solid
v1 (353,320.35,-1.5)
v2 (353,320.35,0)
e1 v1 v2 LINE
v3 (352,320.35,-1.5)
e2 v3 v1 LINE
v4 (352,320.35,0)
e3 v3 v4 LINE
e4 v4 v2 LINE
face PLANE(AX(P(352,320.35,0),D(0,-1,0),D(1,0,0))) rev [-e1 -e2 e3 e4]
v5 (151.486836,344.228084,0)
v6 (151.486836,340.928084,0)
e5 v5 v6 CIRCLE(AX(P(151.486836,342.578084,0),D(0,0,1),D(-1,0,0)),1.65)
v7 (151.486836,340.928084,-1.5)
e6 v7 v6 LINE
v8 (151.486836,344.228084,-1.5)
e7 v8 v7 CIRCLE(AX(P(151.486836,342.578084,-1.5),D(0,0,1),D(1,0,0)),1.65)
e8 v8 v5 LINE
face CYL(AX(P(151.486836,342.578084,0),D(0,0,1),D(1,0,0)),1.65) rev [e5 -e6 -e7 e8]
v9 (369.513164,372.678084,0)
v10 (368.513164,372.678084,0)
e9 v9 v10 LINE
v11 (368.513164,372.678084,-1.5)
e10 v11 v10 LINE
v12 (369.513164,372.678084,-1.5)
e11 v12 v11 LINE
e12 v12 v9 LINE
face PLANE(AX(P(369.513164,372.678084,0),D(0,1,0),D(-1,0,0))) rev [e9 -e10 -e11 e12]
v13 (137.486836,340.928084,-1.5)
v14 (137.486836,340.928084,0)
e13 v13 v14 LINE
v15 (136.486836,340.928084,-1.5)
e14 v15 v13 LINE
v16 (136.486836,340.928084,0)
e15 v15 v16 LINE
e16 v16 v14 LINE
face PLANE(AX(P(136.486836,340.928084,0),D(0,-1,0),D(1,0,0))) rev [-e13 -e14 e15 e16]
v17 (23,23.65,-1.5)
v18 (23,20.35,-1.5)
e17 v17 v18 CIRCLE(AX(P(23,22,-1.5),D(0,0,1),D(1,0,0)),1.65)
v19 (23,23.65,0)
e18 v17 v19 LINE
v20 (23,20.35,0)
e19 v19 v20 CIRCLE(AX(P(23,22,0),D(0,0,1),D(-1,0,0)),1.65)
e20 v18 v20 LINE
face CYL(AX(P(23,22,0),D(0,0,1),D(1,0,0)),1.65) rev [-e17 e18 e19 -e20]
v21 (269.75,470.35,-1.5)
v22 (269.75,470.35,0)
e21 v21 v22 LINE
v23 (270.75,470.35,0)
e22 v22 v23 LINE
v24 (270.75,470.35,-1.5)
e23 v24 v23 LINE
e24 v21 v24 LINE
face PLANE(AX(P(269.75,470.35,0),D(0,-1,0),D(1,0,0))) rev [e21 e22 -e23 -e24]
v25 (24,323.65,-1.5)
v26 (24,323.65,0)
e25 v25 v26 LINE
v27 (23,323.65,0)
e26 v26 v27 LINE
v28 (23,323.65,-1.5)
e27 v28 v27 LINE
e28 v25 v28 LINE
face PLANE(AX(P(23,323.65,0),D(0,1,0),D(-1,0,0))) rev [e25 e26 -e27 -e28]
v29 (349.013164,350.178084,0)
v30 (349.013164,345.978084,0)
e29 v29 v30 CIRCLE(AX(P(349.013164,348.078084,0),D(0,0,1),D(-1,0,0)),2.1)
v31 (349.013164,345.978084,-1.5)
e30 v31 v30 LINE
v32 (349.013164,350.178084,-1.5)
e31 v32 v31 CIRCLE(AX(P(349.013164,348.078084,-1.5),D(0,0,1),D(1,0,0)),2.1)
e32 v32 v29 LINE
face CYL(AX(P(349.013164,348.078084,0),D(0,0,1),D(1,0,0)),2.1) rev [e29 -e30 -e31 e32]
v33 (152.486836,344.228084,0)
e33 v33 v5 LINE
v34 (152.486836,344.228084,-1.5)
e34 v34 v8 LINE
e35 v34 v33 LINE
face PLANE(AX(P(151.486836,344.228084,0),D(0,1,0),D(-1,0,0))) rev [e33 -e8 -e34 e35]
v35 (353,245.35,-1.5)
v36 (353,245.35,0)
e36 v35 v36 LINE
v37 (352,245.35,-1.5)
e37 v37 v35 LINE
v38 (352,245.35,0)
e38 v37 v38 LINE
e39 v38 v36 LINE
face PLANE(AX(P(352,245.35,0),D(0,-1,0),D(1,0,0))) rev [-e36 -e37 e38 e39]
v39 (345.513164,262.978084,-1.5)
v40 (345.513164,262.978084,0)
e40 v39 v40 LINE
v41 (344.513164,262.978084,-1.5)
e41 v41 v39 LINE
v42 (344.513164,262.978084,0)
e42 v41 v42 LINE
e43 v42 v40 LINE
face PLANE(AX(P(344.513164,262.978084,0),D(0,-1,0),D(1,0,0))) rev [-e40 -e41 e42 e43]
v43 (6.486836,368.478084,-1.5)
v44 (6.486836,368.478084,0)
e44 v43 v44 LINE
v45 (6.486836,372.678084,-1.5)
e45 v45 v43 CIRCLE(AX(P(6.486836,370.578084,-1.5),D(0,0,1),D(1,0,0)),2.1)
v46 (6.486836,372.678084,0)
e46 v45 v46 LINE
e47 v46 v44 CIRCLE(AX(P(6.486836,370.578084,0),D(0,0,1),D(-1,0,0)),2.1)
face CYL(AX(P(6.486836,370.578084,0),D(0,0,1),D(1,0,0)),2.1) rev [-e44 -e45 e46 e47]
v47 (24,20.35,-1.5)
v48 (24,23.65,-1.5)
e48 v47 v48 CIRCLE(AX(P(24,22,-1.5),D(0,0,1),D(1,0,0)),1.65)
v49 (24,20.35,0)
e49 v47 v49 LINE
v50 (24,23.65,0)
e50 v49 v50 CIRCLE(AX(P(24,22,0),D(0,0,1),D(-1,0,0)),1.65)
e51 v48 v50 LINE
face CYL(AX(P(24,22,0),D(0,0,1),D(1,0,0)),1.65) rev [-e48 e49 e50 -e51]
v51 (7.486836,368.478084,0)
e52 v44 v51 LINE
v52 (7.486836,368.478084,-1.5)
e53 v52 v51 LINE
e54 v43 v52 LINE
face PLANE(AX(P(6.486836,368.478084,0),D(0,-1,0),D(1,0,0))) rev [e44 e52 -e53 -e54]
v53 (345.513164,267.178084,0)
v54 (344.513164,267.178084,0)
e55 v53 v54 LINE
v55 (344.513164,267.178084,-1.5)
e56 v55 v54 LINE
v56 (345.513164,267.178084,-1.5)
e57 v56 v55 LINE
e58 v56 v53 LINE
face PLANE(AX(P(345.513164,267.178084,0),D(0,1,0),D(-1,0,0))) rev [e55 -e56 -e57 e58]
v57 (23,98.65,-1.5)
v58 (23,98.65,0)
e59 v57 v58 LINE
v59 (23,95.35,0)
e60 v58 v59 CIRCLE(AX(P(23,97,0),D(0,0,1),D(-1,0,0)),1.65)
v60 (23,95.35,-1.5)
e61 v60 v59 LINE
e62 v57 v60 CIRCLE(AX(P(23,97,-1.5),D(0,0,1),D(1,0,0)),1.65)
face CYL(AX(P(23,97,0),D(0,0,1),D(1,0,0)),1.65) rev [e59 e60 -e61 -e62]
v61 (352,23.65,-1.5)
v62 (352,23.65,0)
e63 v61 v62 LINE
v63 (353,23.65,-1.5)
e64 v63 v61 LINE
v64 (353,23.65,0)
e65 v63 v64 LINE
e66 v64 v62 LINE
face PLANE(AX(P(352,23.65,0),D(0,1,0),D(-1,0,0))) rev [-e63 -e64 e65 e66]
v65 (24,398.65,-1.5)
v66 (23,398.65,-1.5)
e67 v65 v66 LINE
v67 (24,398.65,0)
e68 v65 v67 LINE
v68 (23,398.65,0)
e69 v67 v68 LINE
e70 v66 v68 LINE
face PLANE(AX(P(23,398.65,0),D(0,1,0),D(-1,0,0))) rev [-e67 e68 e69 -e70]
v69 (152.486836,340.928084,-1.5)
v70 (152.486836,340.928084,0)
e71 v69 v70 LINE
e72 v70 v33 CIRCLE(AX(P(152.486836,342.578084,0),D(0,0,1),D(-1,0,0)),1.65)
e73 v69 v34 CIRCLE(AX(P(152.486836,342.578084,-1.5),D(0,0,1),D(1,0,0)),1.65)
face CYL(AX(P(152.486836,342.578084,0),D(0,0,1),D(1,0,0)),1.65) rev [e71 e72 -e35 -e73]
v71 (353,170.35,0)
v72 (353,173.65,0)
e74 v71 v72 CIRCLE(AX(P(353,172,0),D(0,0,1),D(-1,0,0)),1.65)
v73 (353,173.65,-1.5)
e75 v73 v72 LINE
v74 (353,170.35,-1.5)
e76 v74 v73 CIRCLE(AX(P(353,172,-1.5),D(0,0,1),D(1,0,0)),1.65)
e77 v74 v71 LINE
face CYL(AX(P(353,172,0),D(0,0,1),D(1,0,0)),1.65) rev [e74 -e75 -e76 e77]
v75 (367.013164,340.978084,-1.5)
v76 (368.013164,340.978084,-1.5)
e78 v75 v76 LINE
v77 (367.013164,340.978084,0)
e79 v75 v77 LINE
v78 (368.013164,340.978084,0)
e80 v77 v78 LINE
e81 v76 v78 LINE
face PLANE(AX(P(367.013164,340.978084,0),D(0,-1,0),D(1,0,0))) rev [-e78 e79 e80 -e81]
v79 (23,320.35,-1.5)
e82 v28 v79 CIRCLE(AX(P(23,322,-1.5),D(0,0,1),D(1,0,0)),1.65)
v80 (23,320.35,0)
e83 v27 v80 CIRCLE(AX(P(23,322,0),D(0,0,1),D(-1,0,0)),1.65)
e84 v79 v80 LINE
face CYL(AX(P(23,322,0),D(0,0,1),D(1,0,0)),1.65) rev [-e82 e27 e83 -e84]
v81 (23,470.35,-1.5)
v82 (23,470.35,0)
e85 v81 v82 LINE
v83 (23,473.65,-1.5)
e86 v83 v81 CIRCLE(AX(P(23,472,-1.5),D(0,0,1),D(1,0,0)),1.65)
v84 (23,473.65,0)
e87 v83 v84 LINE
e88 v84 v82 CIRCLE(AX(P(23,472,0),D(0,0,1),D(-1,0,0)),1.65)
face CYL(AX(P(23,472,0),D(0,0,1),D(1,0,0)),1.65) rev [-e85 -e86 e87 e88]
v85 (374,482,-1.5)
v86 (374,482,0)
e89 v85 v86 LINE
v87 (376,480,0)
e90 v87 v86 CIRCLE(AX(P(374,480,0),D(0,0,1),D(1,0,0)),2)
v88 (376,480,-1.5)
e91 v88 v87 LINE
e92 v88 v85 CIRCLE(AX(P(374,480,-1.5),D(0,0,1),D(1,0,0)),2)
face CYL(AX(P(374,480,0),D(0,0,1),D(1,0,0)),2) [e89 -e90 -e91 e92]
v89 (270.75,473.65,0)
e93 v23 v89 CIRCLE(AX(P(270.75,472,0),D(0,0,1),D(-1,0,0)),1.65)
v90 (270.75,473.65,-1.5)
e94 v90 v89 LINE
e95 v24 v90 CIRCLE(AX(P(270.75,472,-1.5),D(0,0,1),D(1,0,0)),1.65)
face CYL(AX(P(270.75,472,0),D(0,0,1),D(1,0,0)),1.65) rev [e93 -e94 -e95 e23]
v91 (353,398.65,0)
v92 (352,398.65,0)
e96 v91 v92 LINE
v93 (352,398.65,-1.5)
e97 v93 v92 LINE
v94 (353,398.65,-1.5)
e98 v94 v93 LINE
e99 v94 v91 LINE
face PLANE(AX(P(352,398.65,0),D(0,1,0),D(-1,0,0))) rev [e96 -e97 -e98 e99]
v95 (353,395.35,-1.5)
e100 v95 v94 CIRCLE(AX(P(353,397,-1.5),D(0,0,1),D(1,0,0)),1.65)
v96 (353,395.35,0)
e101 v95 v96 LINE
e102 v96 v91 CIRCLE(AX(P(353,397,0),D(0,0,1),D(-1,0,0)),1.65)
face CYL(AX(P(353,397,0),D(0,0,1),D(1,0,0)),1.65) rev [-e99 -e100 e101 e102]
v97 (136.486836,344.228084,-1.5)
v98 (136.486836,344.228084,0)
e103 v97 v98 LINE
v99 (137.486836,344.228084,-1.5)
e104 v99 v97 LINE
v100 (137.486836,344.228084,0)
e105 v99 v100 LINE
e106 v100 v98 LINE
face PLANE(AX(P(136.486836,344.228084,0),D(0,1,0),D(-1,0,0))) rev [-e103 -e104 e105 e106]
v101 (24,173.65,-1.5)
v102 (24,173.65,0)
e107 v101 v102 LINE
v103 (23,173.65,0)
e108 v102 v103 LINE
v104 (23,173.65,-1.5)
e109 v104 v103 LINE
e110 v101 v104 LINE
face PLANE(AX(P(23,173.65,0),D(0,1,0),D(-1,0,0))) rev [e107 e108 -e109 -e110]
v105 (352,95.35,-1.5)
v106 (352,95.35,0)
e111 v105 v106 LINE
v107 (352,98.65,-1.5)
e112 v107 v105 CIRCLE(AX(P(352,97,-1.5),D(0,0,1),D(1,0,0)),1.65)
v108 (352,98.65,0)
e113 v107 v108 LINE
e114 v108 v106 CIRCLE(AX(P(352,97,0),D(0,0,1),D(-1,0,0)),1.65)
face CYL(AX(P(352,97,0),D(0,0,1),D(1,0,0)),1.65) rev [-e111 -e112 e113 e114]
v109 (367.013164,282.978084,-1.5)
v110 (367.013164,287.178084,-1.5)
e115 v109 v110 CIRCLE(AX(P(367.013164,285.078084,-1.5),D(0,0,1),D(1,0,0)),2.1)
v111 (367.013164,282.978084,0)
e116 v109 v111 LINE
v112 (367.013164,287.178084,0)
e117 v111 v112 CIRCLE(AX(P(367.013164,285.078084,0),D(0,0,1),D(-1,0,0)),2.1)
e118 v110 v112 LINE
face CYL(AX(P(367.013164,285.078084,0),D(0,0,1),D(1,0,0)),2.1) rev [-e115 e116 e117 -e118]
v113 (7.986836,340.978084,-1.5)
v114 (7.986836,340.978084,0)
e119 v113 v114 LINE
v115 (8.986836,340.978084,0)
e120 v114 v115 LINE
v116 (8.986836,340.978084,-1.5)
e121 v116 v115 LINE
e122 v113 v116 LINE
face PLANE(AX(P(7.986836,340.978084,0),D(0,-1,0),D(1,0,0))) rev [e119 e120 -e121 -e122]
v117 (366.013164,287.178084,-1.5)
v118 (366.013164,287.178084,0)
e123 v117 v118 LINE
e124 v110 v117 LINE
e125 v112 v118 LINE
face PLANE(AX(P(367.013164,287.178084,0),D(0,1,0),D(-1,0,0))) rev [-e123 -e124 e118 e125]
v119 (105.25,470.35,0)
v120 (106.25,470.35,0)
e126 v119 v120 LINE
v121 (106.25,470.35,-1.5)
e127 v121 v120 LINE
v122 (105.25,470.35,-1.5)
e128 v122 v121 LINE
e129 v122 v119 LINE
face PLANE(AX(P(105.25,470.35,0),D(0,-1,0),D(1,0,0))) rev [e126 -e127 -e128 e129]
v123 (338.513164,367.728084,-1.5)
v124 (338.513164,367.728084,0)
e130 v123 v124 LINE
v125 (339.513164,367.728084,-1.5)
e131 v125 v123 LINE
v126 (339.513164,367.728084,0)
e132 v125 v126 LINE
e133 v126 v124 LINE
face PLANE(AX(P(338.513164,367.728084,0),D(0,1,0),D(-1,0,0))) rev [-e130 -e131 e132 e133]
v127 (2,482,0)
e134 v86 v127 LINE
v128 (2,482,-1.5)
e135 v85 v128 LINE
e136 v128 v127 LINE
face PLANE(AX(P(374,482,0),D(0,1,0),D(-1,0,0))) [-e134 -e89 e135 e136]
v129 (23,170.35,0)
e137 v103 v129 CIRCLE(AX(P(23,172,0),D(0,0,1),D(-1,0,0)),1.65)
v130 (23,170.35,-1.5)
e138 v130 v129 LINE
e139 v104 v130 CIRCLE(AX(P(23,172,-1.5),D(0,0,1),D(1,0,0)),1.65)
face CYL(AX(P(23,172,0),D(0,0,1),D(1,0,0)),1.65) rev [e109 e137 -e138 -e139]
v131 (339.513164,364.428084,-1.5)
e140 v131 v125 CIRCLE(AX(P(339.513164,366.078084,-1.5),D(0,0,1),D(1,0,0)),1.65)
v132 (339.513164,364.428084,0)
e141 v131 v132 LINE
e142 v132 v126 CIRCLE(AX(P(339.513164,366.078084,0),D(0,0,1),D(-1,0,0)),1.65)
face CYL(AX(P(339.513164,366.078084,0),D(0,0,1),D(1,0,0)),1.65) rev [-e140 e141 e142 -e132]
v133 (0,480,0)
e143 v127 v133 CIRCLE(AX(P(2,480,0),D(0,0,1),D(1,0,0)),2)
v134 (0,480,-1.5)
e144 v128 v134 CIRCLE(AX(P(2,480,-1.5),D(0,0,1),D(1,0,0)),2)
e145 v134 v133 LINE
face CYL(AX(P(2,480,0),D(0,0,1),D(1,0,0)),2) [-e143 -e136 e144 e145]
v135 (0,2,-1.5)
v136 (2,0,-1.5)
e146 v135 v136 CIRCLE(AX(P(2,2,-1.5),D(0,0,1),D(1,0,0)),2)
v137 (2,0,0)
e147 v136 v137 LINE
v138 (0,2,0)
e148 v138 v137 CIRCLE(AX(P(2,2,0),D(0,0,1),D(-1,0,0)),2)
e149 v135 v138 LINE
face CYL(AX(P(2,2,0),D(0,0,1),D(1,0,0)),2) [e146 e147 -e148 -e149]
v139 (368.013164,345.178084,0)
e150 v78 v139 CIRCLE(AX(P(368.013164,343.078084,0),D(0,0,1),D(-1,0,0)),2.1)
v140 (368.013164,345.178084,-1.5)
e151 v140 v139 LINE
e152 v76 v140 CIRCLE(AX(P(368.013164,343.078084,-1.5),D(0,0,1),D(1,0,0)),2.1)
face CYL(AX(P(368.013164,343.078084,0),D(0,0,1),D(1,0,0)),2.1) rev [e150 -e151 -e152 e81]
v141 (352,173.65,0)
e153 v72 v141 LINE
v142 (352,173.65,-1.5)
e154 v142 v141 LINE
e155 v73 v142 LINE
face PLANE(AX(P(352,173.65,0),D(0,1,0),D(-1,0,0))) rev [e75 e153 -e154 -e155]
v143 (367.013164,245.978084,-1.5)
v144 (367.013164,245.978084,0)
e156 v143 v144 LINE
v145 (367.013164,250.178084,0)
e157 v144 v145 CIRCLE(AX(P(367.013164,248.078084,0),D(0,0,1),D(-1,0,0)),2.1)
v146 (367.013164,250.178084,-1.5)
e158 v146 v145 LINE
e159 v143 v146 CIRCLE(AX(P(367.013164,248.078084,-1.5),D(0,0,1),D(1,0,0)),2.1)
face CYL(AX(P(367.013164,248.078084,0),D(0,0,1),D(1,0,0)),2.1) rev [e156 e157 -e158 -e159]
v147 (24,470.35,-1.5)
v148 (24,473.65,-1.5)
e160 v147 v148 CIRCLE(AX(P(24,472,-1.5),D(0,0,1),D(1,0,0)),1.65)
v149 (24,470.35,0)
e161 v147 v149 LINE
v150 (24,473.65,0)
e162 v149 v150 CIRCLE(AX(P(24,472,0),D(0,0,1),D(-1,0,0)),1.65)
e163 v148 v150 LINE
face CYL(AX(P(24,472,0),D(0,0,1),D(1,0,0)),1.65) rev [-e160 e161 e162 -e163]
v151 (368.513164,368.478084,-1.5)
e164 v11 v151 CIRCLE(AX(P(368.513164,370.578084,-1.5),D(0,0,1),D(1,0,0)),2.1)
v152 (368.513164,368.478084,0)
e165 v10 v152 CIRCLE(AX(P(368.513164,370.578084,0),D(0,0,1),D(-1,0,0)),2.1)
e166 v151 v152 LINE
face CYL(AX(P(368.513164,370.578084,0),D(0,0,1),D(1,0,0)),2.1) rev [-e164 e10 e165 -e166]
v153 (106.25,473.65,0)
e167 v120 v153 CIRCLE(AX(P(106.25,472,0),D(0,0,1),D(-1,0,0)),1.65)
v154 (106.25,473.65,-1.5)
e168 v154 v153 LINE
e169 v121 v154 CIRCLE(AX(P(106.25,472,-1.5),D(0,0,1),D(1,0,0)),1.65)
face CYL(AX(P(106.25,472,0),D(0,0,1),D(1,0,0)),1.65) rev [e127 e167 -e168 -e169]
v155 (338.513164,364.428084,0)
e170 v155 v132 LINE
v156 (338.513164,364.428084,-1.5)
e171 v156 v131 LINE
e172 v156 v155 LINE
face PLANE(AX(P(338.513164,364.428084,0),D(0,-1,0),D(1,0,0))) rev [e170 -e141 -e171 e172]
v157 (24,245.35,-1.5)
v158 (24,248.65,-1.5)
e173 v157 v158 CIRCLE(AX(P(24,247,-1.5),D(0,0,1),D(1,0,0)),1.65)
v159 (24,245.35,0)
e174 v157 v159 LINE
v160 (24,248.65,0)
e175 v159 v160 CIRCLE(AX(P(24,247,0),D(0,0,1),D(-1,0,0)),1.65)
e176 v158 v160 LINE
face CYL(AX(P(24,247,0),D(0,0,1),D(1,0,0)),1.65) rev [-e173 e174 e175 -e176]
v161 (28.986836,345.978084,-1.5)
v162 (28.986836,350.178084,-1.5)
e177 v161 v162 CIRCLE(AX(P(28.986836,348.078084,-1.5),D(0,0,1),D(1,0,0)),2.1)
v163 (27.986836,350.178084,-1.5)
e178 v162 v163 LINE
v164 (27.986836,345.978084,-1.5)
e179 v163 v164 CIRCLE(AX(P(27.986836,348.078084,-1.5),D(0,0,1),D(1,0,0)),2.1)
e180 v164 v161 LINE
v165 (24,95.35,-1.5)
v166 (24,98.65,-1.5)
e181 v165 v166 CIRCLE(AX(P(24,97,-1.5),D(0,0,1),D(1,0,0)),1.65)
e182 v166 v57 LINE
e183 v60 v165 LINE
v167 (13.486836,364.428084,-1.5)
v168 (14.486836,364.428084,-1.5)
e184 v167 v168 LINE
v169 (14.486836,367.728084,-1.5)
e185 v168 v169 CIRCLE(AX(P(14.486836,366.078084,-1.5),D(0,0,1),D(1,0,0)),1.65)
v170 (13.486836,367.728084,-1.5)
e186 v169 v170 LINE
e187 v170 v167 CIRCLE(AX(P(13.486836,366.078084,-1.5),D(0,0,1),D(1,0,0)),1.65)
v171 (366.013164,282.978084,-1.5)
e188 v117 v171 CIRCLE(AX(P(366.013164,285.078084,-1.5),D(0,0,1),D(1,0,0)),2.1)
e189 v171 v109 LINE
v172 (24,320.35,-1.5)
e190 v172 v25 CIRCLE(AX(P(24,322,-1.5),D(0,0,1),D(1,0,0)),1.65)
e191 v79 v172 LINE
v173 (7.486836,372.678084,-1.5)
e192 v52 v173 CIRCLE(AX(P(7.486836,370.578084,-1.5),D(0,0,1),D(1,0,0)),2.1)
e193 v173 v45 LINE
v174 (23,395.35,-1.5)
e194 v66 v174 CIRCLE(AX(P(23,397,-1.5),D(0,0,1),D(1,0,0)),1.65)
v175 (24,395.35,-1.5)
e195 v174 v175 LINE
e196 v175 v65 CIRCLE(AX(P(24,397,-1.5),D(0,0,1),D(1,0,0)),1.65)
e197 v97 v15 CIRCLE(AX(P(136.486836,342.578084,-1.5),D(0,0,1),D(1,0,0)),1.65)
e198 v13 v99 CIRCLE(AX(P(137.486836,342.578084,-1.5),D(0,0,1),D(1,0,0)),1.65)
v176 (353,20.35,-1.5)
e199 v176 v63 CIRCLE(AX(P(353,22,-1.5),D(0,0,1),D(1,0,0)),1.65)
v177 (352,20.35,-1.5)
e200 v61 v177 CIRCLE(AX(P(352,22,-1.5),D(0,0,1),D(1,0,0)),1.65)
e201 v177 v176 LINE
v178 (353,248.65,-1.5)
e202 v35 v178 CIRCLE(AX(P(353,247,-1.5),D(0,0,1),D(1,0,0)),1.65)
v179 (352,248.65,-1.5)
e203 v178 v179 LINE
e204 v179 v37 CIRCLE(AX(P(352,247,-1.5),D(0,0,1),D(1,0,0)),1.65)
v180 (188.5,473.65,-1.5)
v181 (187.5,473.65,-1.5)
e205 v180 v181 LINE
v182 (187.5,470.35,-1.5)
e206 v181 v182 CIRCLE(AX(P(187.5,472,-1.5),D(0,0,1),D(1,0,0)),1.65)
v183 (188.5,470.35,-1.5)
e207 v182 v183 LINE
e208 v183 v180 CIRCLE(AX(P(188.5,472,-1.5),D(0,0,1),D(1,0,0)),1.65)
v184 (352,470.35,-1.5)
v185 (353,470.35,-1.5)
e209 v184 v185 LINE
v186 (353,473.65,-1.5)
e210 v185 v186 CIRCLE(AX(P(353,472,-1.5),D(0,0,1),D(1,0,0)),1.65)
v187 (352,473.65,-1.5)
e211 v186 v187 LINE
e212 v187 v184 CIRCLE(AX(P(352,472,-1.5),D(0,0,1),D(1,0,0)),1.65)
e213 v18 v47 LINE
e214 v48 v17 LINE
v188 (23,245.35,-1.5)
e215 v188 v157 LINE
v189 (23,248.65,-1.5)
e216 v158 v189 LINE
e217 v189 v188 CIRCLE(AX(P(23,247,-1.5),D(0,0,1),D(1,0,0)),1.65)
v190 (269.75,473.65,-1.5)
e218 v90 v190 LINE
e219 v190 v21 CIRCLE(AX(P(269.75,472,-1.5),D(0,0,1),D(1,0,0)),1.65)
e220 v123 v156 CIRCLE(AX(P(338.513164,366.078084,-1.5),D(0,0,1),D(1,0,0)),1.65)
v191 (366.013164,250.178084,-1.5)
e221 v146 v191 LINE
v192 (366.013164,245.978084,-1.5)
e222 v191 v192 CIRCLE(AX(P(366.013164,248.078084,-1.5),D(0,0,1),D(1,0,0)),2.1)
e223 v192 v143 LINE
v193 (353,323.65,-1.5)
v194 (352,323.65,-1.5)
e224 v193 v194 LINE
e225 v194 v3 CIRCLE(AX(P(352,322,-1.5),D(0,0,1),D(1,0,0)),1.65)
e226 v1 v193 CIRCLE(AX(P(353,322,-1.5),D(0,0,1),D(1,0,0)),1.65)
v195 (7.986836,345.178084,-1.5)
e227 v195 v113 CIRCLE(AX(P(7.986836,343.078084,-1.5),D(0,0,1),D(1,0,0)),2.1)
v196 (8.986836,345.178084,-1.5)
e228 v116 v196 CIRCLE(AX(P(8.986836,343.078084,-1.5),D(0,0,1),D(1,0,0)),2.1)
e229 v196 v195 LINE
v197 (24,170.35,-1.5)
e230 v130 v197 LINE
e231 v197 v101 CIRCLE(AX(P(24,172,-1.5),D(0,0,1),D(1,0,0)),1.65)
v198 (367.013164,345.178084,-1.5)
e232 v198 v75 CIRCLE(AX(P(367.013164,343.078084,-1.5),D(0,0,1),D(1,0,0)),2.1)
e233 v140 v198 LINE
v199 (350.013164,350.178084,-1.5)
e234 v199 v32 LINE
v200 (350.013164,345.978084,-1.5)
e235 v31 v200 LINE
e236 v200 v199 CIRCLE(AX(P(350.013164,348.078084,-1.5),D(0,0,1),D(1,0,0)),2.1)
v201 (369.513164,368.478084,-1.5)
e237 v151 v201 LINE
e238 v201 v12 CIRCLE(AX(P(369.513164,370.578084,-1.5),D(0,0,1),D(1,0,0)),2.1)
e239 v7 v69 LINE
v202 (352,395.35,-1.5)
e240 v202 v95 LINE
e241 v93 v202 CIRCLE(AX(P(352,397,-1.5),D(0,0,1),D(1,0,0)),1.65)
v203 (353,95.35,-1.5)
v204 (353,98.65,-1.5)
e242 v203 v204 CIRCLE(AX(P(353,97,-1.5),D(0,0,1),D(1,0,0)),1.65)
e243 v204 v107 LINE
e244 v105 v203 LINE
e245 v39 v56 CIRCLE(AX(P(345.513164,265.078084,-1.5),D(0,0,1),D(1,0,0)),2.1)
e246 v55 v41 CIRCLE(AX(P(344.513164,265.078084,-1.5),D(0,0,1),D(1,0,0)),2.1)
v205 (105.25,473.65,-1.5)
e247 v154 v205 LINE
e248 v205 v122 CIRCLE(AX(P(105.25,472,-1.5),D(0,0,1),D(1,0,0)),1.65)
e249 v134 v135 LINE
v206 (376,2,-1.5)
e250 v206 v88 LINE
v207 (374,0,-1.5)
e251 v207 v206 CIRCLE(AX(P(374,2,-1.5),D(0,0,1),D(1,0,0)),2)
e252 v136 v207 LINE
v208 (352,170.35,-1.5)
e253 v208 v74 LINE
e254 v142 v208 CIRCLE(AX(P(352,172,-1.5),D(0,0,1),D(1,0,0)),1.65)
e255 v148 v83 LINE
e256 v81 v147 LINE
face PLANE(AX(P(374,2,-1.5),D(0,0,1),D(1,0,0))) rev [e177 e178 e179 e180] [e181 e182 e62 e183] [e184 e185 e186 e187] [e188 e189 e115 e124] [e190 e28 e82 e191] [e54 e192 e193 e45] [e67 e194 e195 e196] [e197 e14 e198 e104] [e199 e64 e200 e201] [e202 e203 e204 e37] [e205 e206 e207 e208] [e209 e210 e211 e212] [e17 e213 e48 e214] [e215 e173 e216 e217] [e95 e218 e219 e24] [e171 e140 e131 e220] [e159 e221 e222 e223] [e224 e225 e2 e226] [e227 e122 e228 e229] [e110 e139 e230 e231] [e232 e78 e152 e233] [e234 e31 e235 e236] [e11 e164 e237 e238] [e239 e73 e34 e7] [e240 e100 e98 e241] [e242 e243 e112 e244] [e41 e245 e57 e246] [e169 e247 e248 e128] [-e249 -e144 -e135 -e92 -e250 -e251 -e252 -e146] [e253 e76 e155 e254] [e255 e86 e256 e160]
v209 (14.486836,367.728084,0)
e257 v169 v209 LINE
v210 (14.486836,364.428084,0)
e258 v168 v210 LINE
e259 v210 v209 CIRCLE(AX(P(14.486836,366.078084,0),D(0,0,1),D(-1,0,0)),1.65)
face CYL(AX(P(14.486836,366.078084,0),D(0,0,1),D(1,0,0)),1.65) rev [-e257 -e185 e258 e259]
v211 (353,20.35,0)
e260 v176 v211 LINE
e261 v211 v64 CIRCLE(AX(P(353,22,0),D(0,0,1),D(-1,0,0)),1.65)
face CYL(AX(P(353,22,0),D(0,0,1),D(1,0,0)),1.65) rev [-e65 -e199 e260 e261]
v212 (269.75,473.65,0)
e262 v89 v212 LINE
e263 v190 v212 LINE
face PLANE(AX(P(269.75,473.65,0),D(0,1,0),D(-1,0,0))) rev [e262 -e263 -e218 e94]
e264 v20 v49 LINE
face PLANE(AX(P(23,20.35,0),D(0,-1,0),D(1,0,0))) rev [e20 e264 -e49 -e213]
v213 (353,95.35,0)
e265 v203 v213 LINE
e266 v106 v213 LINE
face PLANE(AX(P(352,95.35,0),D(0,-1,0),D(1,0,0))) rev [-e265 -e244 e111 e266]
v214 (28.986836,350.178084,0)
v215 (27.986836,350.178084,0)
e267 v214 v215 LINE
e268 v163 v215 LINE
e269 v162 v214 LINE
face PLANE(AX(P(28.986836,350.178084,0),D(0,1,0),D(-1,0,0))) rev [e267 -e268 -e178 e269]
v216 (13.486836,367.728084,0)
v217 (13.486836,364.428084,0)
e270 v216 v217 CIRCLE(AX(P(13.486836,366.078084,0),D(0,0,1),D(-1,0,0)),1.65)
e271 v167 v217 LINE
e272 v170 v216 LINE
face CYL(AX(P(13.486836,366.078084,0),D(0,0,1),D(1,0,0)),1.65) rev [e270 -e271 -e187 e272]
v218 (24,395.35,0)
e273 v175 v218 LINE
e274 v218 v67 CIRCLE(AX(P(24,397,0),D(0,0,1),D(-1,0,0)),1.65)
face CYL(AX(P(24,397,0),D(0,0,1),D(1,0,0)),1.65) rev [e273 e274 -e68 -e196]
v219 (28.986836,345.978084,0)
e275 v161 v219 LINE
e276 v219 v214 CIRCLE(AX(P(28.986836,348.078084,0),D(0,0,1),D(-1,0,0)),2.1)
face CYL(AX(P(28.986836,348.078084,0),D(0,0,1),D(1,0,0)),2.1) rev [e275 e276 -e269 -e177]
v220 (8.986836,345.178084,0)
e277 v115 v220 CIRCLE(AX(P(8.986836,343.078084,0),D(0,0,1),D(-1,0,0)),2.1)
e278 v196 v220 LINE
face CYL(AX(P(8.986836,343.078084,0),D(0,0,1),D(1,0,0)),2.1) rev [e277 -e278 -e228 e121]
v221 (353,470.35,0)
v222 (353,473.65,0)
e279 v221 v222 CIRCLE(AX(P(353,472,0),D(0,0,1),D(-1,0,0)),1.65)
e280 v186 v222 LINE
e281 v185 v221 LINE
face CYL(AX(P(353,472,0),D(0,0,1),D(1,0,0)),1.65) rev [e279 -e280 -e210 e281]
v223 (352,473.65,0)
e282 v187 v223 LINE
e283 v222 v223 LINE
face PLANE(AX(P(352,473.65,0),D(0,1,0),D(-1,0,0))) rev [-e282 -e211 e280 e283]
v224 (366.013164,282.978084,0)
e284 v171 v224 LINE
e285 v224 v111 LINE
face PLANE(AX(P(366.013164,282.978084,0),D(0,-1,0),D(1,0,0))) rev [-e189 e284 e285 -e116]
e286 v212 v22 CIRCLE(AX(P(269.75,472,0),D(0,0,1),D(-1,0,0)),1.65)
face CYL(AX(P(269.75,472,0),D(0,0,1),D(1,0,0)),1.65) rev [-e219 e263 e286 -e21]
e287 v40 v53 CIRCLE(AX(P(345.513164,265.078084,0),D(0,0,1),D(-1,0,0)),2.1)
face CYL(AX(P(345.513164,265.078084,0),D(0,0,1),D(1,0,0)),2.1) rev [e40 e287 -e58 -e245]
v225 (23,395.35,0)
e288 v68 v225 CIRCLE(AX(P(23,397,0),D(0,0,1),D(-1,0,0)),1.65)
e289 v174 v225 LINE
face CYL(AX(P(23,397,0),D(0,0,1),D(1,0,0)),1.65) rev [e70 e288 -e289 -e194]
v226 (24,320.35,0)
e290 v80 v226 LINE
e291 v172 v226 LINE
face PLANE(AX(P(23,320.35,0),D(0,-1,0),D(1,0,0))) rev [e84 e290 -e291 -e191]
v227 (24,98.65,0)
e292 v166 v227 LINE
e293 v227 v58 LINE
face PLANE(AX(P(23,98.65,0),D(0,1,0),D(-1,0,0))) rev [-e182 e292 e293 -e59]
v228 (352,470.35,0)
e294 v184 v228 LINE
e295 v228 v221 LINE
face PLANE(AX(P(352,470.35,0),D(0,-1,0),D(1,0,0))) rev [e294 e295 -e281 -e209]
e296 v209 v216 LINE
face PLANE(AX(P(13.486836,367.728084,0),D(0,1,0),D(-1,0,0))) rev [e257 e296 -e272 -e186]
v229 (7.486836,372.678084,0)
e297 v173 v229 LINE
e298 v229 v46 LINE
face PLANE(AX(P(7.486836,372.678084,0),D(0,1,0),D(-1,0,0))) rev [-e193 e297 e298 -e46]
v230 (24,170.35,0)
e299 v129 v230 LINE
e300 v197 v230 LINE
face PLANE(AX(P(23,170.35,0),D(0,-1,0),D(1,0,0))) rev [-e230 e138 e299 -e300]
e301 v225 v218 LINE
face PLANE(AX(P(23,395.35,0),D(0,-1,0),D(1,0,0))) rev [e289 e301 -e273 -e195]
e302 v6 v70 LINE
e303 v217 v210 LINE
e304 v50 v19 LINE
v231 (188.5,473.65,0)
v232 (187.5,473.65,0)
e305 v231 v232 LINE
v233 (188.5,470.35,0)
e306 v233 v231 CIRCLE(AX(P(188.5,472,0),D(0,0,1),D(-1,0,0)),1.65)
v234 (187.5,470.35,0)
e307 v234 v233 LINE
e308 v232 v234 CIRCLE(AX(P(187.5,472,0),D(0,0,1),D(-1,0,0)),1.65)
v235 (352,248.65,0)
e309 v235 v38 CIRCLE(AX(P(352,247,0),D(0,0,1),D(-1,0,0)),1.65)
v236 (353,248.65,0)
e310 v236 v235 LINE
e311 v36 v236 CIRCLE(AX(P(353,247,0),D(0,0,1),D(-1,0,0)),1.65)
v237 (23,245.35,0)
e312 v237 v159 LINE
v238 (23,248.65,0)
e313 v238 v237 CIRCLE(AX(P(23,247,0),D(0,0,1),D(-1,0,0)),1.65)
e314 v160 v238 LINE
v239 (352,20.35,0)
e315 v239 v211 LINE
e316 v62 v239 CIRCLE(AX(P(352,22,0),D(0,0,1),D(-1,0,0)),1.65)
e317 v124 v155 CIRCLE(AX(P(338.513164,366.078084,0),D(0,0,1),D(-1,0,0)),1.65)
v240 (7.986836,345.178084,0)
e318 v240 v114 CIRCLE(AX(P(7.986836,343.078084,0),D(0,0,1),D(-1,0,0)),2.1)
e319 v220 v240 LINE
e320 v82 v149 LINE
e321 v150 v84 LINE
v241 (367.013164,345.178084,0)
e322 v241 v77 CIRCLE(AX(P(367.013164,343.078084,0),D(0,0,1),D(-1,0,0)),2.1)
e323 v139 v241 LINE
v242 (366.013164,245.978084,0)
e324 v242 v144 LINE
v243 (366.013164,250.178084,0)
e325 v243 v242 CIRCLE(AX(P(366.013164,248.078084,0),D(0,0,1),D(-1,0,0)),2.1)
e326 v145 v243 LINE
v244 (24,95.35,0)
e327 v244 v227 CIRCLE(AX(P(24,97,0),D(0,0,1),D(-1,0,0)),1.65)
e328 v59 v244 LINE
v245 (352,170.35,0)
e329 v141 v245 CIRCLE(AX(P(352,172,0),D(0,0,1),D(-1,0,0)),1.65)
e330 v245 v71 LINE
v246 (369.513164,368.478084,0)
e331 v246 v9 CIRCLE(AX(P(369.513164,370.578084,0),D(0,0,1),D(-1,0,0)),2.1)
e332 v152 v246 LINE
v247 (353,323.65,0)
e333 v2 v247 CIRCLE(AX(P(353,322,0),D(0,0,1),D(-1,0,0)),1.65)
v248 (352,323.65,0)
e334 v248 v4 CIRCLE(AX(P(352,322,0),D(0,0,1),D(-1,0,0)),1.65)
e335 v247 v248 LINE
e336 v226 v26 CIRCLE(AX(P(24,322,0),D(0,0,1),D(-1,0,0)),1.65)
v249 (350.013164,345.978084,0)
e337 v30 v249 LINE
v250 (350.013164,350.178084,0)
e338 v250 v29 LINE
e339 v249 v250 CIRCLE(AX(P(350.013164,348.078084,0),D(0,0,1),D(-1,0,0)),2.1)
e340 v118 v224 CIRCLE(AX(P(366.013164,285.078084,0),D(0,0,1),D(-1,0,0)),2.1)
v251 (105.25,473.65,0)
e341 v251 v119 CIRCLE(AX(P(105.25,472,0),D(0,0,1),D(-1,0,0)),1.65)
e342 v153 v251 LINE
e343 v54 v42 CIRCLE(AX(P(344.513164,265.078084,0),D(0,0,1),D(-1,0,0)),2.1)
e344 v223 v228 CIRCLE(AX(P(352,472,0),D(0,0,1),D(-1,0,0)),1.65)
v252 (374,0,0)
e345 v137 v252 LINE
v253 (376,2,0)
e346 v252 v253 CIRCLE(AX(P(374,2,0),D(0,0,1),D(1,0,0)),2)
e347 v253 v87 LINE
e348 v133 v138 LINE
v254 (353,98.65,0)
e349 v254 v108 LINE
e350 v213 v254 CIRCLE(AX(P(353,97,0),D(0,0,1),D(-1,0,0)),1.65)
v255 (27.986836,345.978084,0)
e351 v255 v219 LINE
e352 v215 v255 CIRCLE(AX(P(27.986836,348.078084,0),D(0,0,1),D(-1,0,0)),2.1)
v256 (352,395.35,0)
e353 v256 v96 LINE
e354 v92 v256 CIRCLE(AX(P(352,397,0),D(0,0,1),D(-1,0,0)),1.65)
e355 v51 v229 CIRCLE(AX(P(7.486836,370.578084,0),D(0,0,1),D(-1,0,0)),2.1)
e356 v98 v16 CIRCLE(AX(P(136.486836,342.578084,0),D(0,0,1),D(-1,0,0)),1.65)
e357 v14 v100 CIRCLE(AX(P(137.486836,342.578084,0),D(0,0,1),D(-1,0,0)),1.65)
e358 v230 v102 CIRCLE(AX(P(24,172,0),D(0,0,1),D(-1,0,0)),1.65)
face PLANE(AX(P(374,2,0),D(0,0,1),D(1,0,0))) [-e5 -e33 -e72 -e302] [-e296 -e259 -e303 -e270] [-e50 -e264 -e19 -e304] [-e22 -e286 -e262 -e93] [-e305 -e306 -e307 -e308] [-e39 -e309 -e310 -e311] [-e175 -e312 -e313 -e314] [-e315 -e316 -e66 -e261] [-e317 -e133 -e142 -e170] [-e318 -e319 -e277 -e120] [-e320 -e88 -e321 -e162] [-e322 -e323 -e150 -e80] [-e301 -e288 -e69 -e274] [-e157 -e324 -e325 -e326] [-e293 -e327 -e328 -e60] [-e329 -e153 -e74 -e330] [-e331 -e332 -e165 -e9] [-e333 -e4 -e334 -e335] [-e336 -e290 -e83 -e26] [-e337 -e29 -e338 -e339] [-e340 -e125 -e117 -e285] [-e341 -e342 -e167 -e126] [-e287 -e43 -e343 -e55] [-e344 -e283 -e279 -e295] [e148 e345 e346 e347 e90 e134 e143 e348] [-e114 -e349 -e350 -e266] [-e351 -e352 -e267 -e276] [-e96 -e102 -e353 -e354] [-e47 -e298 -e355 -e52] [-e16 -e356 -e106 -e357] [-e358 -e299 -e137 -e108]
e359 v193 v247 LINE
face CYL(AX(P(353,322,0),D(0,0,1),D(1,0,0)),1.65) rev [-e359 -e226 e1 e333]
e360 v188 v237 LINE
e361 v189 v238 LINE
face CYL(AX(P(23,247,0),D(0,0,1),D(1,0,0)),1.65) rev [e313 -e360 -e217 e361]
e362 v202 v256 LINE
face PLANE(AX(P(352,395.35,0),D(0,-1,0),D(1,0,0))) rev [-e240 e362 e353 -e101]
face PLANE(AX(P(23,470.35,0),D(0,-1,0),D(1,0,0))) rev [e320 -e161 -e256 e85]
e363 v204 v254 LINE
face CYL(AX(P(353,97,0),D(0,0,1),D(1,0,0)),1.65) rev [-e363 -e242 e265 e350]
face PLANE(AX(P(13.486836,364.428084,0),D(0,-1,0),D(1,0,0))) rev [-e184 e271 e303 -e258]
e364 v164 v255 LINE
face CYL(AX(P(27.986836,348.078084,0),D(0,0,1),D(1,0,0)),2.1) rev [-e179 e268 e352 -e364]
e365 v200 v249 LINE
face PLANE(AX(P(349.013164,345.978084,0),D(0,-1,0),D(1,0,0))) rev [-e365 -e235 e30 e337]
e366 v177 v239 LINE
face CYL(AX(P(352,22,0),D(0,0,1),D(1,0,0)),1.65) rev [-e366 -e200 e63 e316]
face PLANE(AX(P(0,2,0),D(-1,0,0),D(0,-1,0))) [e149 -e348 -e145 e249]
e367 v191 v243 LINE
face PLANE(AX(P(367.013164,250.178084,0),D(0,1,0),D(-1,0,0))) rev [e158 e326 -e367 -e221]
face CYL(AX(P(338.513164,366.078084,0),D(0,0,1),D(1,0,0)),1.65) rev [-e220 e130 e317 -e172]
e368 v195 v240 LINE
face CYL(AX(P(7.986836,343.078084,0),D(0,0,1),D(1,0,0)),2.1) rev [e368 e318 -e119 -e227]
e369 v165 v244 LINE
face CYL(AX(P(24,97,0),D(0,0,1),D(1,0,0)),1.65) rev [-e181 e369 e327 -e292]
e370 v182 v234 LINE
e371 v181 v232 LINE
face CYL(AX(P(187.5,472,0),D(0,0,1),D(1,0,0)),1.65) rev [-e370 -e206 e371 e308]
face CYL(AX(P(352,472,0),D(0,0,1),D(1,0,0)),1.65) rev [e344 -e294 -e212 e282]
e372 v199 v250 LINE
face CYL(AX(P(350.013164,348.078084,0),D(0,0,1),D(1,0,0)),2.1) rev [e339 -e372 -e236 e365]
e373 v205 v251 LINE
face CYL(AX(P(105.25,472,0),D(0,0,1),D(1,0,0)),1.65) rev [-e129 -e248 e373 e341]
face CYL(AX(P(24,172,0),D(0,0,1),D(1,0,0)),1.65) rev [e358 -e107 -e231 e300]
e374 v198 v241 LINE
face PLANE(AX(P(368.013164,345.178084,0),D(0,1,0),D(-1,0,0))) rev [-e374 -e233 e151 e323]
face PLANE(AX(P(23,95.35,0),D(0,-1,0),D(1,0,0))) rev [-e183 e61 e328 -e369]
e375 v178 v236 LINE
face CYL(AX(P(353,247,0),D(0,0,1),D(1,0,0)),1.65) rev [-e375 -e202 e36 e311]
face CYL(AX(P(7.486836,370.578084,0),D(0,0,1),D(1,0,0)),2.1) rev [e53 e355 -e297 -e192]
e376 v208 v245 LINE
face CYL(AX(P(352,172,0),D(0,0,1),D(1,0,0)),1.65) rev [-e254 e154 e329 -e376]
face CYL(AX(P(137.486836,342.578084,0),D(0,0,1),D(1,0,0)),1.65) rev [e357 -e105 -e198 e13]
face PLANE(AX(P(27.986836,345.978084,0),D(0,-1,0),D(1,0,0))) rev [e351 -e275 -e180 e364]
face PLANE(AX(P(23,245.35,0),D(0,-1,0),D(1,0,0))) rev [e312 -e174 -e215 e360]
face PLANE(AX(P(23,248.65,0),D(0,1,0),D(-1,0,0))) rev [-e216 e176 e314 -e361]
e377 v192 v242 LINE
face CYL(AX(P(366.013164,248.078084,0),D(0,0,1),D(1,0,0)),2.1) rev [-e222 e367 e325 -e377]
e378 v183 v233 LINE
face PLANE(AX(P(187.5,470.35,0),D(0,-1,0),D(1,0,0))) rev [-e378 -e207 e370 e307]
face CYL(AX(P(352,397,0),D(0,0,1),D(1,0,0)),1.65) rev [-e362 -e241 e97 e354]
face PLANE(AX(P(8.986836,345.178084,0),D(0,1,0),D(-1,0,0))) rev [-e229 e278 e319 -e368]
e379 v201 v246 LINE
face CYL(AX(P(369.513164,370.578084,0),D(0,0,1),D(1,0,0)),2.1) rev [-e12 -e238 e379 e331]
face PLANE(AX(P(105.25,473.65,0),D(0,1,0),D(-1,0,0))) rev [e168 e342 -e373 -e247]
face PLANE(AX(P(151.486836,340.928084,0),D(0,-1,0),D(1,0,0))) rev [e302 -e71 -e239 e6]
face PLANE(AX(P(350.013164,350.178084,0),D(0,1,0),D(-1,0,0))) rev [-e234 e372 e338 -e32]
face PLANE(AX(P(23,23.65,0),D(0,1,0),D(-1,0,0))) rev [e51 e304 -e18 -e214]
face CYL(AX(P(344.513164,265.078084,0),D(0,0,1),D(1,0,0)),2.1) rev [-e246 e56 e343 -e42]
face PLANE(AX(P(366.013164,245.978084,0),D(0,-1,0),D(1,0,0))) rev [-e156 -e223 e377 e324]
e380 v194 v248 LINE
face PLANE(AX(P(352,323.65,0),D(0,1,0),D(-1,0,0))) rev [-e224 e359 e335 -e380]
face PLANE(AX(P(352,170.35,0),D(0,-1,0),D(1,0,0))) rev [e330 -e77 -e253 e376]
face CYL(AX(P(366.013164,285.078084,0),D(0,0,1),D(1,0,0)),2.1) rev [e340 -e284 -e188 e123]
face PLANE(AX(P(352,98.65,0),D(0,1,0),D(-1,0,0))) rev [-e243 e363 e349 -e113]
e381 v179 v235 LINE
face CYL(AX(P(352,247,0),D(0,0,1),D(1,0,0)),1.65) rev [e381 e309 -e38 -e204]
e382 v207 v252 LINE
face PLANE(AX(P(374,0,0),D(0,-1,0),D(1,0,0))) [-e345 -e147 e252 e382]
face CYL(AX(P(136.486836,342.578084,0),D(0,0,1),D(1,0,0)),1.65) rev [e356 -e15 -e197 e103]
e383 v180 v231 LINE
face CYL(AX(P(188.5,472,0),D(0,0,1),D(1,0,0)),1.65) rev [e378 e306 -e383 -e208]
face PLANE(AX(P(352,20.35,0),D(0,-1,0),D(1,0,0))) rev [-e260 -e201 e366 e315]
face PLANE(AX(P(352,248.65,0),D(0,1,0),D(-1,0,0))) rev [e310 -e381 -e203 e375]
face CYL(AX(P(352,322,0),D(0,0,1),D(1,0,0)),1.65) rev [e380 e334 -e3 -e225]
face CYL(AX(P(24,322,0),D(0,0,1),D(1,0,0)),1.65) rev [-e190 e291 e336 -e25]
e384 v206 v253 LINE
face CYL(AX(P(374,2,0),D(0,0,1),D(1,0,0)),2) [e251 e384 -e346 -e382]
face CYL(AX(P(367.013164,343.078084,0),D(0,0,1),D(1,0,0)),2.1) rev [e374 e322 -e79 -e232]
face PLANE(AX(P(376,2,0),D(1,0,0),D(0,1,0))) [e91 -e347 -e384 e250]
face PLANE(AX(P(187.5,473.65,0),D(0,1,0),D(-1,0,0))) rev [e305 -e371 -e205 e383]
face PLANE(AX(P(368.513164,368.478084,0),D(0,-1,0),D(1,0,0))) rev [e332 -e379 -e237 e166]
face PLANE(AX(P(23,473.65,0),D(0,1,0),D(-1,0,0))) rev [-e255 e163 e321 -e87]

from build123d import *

# Parameters (mm, degrees)
CONVERT_SOLID1_START = -1.5
CONVERT_SOLID1_DEPTH = 1.5


# Read off the part's stored shape, not the designer's step: Convert-Solid1
with BuildPart() as part:
    # Convert-Solid1 outline → Convert-Solid1 (new body)
    with BuildSketch(Plane.XY.offset(CONVERT_SOLID1_START)):
        with BuildLine():
            Line((376, 2), (376, 480))
            ThreePointArc((376, 480), (375.414213562, 481.414213562), (374, 482))
            Line((374, 482), (2, 482))
            ThreePointArc((2, 482), (0.585786438, 481.414213562), (0, 480))
            Line((0, 480), (0, 2))
            ThreePointArc((0, 2), (0.585786438, 0.585786438), (2, 0))
            Line((2, 0), (374, 0))
            ThreePointArc((374, 0), (375.414213562, 0.585786438), (376, 2))
        make_face()
        with BuildLine():
            ThreePointArc((24, 23.65), (25.65, 22), (24, 20.35))
            Line((24, 20.35), (23, 20.35))
            ThreePointArc((23, 20.35), (21.35, 22), (23, 23.65))
            Line((23, 23.65), (24, 23.65))
        make_face(mode=Mode.SUBTRACT)
        with BuildLine():
            ThreePointArc((24, 98.65), (25.65, 97), (24, 95.35))
            Line((24, 95.35), (23, 95.35))
            ThreePointArc((23, 95.35), (21.35, 97), (23, 98.65))
            Line((23, 98.65), (24, 98.65))
        make_face(mode=Mode.SUBTRACT)
        with BuildLine():
            ThreePointArc((24, 173.65), (25.65, 172), (24, 170.35))
            Line((24, 170.35), (23, 170.35))
            ThreePointArc((23, 170.35), (21.35, 172), (23, 173.65))
            Line((23, 173.65), (24, 173.65))
        make_face(mode=Mode.SUBTRACT)
        with BuildLine():
            ThreePointArc((353, 23.65), (354.65, 22), (353, 20.35))
            Line((353, 20.35), (352, 20.35))
            ThreePointArc((352, 20.35), (350.35, 22), (352, 23.65))
            Line((352, 23.65), (353, 23.65))
        make_face(mode=Mode.SUBTRACT)
        with BuildLine():
            ThreePointArc((353, 98.65), (354.65, 97), (353, 95.35))
            Line((353, 95.35), (352, 95.35))
            ThreePointArc((352, 95.35), (350.35, 97), (352, 98.65))
            Line((352, 98.65), (353, 98.65))
        make_face(mode=Mode.SUBTRACT)
        with BuildLine():
            ThreePointArc((353, 173.65), (354.65, 172), (353, 170.35))
            Line((353, 170.35), (352, 170.35))
            ThreePointArc((352, 170.35), (350.35, 172), (352, 173.65))
            Line((352, 173.65), (353, 173.65))
        make_face(mode=Mode.SUBTRACT)
        with BuildLine():
            ThreePointArc((24, 248.65), (25.65, 247), (24, 245.35))
            Line((24, 245.35), (23, 245.35))
            ThreePointArc((23, 245.35), (21.35, 247), (23, 248.65))
            Line((23, 248.65), (24, 248.65))
        make_face(mode=Mode.SUBTRACT)
        with BuildLine():
            ThreePointArc((24, 323.65), (25.65, 322), (24, 320.35))
            Line((24, 320.35), (23, 320.35))
            ThreePointArc((23, 320.35), (21.35, 322), (23, 323.65))
            Line((23, 323.65), (24, 323.65))
        make_face(mode=Mode.SUBTRACT)
        with BuildLine():
            ThreePointArc((8.98683607, 345.178083895), (11.08683607, 343.078083895), (8.98683607, 340.978083895))
            Line((8.98683607, 340.978083895), (7.98683607, 340.978083895))
            ThreePointArc((7.98683607, 340.978083895), (5.88683607, 343.078083895), (7.98683607, 345.178083895))
            Line((7.98683607, 345.178083895), (8.98683607, 345.178083895))
        make_face(mode=Mode.SUBTRACT)
        with BuildLine():
            ThreePointArc((28.98683607, 350.178083895), (31.08683607, 348.078083895), (28.98683607, 345.978083895))
            Line((28.98683607, 345.978083895), (27.98683607, 345.978083895))
            ThreePointArc((27.98683607, 345.978083895), (25.88683607, 348.078083895), (27.98683607, 350.178083895))
            Line((27.98683607, 350.178083895), (28.98683607, 350.178083895))
        make_face(mode=Mode.SUBTRACT)
        with BuildLine():
            ThreePointArc((137.48683607, 344.228083895), (139.13683607, 342.578083895), (137.48683607, 340.928083895))
            Line((137.48683607, 340.928083895), (136.48683607, 340.928083895))
            ThreePointArc((136.48683607, 340.928083895), (134.83683607, 342.578083895), (136.48683607, 344.228083895))
            Line((136.48683607, 344.228083895), (137.48683607, 344.228083895))
        make_face(mode=Mode.SUBTRACT)
        with BuildLine():
            ThreePointArc((152.48683607, 344.228083895), (154.13683607, 342.578083895), (152.48683607, 340.928083895))
            Line((152.48683607, 340.928083895), (151.48683607, 340.928083895))
            ThreePointArc((151.48683607, 340.928083895), (149.83683607, 342.578083895), (151.48683607, 344.228083895))
            Line((151.48683607, 344.228083895), (152.48683607, 344.228083895))
        make_face(mode=Mode.SUBTRACT)
        with BuildLine():
            ThreePointArc((7.48683607, 372.678083895), (9.58683607, 370.578083895), (7.48683607, 368.478083895))
            Line((7.48683607, 368.478083895), (6.48683607, 368.478083895))
            ThreePointArc((6.48683607, 368.478083895), (4.38683607, 370.578083895), (6.48683607, 372.678083895))
            Line((6.48683607, 372.678083895), (7.48683607, 372.678083895))
        make_face(mode=Mode.SUBTRACT)
        with BuildLine():
            ThreePointArc((14.48683607, 367.728083895), (16.13683607, 366.078083895), (14.48683607, 364.428083895))
            Line((14.48683607, 364.428083895), (13.48683607, 364.428083895))
            ThreePointArc((13.48683607, 364.428083895), (11.83683607, 366.078083895), (13.48683607, 367.728083895))
            Line((13.48683607, 367.728083895), (14.48683607, 367.728083895))
        make_face(mode=Mode.SUBTRACT)
        with BuildLine():
            ThreePointArc((24, 398.65), (25.65, 397), (24, 395.35))
            Line((24, 395.35), (23, 395.35))
            ThreePointArc((23, 395.35), (21.35, 397), (23, 398.65))
            Line((23, 398.65), (24, 398.65))
        make_face(mode=Mode.SUBTRACT)
        with BuildLine():
            ThreePointArc((24, 473.65), (25.65, 472), (24, 470.35))
            Line((24, 470.35), (23, 470.35))
            ThreePointArc((23, 470.35), (21.35, 472), (23, 473.65))
            Line((23, 473.65), (24, 473.65))
        make_face(mode=Mode.SUBTRACT)
        with BuildLine():
            ThreePointArc((106.25, 473.65), (107.9, 472), (106.25, 470.35))
            Line((106.25, 470.35), (105.25, 470.35))
            ThreePointArc((105.25, 470.35), (103.6, 472), (105.25, 473.65))
            Line((105.25, 473.65), (106.25, 473.65))
        make_face(mode=Mode.SUBTRACT)
        with BuildLine():
            ThreePointArc((345.51316393, 267.178083895), (347.61316393, 265.078083895), (345.51316393, 262.978083895))
            Line((345.51316393, 262.978083895), (344.51316393, 262.978083895))
            ThreePointArc((344.51316393, 262.978083895), (342.41316393, 265.078083895), (344.51316393, 267.178083895))
            Line((344.51316393, 267.178083895), (345.51316393, 267.178083895))
        make_face(mode=Mode.SUBTRACT)
        with BuildLine():
            ThreePointArc((353, 248.65), (354.65, 247), (353, 245.35))
            Line((353, 245.35), (352, 245.35))
            ThreePointArc((352, 245.35), (350.35, 247), (352, 248.65))
            Line((352, 248.65), (353, 248.65))
        make_face(mode=Mode.SUBTRACT)
        with BuildLine():
            ThreePointArc((367.01316393, 250.178083895), (369.11316393, 248.078083895), (367.01316393, 245.978083895))
            Line((367.01316393, 245.978083895), (366.01316393, 245.978083895))
            ThreePointArc((366.01316393, 245.978083895), (363.91316393, 248.078083895), (366.01316393, 250.178083895))
            Line((366.01316393, 250.178083895), (367.01316393, 250.178083895))
        make_face(mode=Mode.SUBTRACT)
        with BuildLine():
            ThreePointArc((367.01316393, 287.178083895), (369.11316393, 285.078083895), (367.01316393, 282.978083895))
            Line((367.01316393, 282.978083895), (366.01316393, 282.978083895))
            ThreePointArc((366.01316393, 282.978083895), (363.91316393, 285.078083895), (366.01316393, 287.178083895))
            Line((366.01316393, 287.178083895), (367.01316393, 287.178083895))
        make_face(mode=Mode.SUBTRACT)
        with BuildLine():
            ThreePointArc((353, 323.65), (354.65, 322), (353, 320.35))
            Line((353, 320.35), (352, 320.35))
            ThreePointArc((352, 320.35), (350.35, 322), (352, 323.65))
            Line((352, 323.65), (353, 323.65))
        make_face(mode=Mode.SUBTRACT)
        with BuildLine():
            ThreePointArc((350.01316393, 350.178083895), (352.11316393, 348.078083895), (350.01316393, 345.978083895))
            Line((350.01316393, 345.978083895), (349.01316393, 345.978083895))
            ThreePointArc((349.01316393, 345.978083895), (346.91316393, 348.078083895), (349.01316393, 350.178083895))
            Line((349.01316393, 350.178083895), (350.01316393, 350.178083895))
        make_face(mode=Mode.SUBTRACT)
        with BuildLine():
            ThreePointArc((368.01316393, 345.178083895), (370.11316393, 343.078083895), (368.01316393, 340.978083895))
            Line((368.01316393, 340.978083895), (367.01316393, 340.978083895))
            ThreePointArc((367.01316393, 340.978083895), (364.91316393, 343.078083895), (367.01316393, 345.178083895))
            Line((367.01316393, 345.178083895), (368.01316393, 345.178083895))
        make_face(mode=Mode.SUBTRACT)
        with BuildLine():
            ThreePointArc((188.5, 473.65), (190.15, 472), (188.5, 470.35))
            Line((188.5, 470.35), (187.5, 470.35))
            ThreePointArc((187.5, 470.35), (185.85, 472), (187.5, 473.65))
            Line((187.5, 473.65), (188.5, 473.65))
        make_face(mode=Mode.SUBTRACT)
        with BuildLine():
            ThreePointArc((270.75, 473.65), (272.4, 472), (270.75, 470.35))
            Line((270.75, 470.35), (269.75, 470.35))
            ThreePointArc((269.75, 470.35), (268.1, 472), (269.75, 473.65))
            Line((269.75, 473.65), (270.75, 473.65))
        make_face(mode=Mode.SUBTRACT)
        with BuildLine():
            ThreePointArc((339.51316393, 367.728083895), (341.16316393, 366.078083895), (339.51316393, 364.428083895))
            Line((339.51316393, 364.428083895), (338.51316393, 364.428083895))
            ThreePointArc((338.51316393, 364.428083895), (336.86316393, 366.078083895), (338.51316393, 367.728083895))
            Line((338.51316393, 367.728083895), (339.51316393, 367.728083895))
        make_face(mode=Mode.SUBTRACT)
        with BuildLine():
            ThreePointArc((369.51316393, 372.678083895), (371.61316393, 370.578083895), (369.51316393, 368.478083895))
            Line((369.51316393, 368.478083895), (368.51316393, 368.478083895))
            ThreePointArc((368.51316393, 368.478083895), (366.41316393, 370.578083895), (368.51316393, 372.678083895))
            Line((368.51316393, 372.678083895), (369.51316393, 372.678083895))
        make_face(mode=Mode.SUBTRACT)
        with BuildLine():
            ThreePointArc((353, 398.65), (354.65, 397), (353, 395.35))
            Line((353, 395.35), (352, 395.35))
            ThreePointArc((352, 395.35), (350.35, 397), (352, 398.65))
            Line((352, 398.65), (353, 398.65))
        make_face(mode=Mode.SUBTRACT)
        with BuildLine():
            ThreePointArc((353, 473.65), (354.65, 472), (353, 470.35))
            Line((353, 470.35), (352, 470.35))
            ThreePointArc((352, 470.35), (350.35, 472), (352, 473.65))
            Line((352, 473.65), (353, 473.65))
        make_face(mode=Mode.SUBTRACT)
    extrude(amount=CONVERT_SOLID1_DEPTH)


solid = part.part
